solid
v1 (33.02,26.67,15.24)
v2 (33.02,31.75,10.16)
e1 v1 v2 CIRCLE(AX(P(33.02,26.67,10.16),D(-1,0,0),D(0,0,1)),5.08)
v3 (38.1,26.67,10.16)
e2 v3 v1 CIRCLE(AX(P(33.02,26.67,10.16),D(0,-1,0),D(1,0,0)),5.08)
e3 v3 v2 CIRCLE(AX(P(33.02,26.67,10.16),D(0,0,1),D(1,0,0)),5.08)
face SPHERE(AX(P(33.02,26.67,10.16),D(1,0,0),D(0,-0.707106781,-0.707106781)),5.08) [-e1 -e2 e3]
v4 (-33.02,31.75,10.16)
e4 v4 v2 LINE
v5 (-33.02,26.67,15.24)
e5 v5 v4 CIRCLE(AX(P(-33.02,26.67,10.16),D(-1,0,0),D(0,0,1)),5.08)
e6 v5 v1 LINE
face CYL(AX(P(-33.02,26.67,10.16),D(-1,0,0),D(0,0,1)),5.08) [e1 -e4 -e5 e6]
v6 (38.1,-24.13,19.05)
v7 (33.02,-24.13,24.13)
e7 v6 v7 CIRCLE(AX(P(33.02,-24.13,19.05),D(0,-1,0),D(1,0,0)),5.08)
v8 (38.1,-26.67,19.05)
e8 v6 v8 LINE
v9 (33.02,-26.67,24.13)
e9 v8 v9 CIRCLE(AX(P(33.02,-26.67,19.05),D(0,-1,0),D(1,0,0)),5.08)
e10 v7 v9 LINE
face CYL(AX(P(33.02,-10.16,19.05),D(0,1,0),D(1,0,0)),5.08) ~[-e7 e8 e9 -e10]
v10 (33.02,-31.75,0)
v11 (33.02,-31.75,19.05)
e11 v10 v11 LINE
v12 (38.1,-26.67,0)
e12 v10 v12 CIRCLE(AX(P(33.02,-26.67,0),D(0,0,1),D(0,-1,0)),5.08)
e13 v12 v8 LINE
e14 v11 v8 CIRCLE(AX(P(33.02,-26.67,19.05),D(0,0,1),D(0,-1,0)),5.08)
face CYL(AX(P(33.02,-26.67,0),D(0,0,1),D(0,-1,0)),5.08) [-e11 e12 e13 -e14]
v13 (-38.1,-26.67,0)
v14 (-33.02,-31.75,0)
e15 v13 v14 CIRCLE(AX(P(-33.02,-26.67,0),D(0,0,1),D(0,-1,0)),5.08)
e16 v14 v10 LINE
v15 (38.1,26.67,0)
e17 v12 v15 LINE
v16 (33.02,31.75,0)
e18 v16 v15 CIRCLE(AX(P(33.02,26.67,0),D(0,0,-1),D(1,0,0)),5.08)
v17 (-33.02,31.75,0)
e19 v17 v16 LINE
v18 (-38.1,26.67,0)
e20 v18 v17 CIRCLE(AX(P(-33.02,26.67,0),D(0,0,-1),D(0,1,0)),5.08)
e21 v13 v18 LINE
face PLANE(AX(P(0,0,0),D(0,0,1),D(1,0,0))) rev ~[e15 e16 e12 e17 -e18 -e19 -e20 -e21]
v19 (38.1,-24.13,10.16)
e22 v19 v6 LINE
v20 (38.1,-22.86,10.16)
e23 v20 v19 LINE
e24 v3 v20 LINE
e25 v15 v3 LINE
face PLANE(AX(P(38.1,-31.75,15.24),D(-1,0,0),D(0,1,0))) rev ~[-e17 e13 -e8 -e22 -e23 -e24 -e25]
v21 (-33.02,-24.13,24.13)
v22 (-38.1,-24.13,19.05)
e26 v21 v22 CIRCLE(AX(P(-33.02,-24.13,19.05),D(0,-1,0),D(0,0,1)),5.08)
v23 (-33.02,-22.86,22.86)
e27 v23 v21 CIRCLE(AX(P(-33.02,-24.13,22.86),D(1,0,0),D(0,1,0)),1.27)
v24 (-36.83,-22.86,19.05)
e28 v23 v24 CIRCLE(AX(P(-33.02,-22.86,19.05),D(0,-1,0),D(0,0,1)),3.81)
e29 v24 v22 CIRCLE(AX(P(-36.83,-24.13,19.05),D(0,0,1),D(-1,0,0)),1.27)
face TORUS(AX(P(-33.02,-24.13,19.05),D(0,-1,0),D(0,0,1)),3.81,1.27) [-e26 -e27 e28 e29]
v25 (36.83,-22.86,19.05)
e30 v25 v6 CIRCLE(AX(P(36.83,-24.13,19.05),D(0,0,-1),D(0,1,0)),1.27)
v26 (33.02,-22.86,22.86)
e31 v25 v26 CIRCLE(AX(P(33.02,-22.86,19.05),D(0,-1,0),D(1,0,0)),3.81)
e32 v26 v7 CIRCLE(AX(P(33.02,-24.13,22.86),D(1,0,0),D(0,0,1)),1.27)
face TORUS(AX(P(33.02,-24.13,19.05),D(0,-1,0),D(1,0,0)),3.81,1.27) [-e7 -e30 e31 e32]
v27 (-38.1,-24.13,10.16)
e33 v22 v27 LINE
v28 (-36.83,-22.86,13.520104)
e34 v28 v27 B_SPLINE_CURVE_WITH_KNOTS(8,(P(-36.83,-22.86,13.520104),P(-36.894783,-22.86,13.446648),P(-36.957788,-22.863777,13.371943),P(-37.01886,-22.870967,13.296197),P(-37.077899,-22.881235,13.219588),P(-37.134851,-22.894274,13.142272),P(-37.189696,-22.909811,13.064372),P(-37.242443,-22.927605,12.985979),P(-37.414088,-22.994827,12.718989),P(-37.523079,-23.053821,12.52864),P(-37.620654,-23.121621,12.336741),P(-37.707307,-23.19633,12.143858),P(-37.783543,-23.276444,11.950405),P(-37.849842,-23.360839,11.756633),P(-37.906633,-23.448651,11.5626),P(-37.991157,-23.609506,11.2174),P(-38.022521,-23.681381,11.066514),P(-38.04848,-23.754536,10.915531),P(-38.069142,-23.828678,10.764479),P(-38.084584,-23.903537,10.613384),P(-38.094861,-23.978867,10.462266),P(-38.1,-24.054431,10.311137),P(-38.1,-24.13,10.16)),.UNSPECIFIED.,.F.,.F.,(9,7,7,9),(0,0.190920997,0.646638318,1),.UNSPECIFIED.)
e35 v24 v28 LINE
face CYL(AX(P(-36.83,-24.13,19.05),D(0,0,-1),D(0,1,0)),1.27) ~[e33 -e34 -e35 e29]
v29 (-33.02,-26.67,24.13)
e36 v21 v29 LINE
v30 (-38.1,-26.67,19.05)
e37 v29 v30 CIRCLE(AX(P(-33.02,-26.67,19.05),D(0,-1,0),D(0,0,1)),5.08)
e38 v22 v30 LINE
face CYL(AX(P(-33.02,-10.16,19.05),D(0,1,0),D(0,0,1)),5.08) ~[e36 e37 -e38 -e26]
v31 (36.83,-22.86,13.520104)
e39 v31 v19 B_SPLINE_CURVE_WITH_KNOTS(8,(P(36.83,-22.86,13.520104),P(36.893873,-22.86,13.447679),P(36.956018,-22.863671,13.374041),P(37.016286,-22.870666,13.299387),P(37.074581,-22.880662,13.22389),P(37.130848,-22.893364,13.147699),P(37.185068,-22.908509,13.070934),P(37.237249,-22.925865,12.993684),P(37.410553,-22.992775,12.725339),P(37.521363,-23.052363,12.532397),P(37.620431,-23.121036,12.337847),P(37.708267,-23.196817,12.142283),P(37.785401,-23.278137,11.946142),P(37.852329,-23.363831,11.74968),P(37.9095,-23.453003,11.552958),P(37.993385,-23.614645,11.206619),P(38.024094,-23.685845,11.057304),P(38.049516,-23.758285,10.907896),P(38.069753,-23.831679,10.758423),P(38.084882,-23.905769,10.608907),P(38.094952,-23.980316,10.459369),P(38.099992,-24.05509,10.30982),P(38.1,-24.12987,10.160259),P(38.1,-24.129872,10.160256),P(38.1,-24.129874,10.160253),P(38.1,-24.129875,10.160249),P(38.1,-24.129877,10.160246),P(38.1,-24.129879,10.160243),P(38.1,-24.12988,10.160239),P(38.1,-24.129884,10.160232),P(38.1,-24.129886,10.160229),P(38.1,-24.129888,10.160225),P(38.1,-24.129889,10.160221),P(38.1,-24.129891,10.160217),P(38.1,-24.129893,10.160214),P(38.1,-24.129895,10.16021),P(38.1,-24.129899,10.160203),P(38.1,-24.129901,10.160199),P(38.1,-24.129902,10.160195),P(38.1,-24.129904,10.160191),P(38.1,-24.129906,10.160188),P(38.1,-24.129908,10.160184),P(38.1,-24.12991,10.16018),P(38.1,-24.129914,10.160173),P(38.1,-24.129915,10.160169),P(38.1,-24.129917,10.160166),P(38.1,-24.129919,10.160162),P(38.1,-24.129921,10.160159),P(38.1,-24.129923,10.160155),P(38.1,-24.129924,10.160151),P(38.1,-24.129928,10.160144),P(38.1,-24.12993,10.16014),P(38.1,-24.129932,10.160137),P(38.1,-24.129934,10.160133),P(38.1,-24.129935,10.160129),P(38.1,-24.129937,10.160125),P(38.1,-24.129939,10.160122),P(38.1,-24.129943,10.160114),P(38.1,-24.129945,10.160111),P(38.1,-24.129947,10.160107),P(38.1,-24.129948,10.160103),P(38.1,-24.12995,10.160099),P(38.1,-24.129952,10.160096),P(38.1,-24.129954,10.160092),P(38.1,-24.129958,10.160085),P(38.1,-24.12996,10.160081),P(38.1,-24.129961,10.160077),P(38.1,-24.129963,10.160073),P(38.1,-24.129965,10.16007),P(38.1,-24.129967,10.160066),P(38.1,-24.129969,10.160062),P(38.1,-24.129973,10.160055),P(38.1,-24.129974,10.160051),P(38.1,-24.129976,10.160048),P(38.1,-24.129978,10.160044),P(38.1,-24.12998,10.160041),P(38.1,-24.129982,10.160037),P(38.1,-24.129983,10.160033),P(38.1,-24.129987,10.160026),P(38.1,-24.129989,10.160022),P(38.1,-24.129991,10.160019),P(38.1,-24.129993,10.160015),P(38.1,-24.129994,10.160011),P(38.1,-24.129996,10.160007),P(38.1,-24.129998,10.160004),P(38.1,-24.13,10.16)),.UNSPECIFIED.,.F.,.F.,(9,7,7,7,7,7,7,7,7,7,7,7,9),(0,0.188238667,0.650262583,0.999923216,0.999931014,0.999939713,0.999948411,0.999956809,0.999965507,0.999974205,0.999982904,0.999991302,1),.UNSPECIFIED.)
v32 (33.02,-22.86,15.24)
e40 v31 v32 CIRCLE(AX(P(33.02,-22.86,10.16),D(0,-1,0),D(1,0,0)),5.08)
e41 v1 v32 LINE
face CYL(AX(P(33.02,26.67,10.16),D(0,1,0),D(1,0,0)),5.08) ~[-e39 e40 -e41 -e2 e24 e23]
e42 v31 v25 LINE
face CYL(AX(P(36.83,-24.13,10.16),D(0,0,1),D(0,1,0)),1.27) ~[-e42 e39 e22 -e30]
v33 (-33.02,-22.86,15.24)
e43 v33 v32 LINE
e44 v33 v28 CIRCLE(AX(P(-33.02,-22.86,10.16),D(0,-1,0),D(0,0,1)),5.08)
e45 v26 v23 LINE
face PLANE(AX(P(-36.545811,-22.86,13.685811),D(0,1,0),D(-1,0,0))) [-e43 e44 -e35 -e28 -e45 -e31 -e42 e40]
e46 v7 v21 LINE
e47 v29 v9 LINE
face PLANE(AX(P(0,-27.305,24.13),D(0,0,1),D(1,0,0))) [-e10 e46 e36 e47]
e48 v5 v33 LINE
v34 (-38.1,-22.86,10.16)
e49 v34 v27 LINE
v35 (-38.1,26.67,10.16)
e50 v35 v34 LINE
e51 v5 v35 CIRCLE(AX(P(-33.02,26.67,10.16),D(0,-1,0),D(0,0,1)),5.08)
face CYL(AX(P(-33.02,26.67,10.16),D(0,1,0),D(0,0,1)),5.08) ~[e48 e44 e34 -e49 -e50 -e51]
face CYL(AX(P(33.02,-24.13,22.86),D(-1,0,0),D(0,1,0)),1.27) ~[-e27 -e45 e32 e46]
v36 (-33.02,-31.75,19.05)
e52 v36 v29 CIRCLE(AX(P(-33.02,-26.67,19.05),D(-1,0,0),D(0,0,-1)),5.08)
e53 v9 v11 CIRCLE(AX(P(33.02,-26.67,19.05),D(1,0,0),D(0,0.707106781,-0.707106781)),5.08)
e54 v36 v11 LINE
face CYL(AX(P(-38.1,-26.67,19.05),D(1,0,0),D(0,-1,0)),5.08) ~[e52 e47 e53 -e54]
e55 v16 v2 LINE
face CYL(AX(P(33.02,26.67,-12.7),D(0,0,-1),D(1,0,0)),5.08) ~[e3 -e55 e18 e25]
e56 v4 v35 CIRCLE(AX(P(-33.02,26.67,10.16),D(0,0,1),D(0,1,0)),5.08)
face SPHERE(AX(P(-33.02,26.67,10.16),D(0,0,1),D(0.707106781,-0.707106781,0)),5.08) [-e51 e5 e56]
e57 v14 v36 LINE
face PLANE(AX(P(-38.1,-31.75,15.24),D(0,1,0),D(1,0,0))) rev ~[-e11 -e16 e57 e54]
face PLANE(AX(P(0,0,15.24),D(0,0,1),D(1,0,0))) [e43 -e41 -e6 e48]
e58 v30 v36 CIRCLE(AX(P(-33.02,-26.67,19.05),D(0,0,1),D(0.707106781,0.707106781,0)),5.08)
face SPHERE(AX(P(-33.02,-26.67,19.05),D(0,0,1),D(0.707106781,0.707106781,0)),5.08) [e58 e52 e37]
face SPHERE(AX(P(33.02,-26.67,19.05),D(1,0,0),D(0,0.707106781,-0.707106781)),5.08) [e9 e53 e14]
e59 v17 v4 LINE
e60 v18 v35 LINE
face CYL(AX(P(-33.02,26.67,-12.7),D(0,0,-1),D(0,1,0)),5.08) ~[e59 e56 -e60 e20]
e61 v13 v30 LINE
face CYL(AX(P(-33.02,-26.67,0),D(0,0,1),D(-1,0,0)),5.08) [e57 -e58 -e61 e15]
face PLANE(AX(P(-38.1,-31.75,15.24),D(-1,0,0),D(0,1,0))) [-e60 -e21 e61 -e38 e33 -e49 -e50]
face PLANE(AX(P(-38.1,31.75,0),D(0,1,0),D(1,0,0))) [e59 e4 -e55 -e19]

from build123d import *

# Parameters (mm, degrees)
F0_W         = 76.2
F0_H         = 63.5
F1_DEPTH     = 15.24
F2_W         = 76.2
F2_H         = 8.89
F3_DEPTH     = 8.89
F4_R         = 5.08
F5_T1_DEPTH  = 16.51
F5_T3_DEPTH  = 49.53
F5_T5_DEPTH  = 66.04
F5_T7_DEPTH  = 22.86
F5_S11_W     = 5.08
F5_S11_H     = 5.08
F5_T12_DEPTH = 5.08
F5_S17_W     = 5.08
F5_S17_H     = 5.08
F5_T18_DEPTH = 5.08
F5_S23_W     = 5.08
F5_S23_H     = 5.08
F5_T24_DEPTH = 5.08
F5_S29_W     = 5.08
F5_S29_H     = 5.08
F5_T30_DEPTH = 5.08
F6_R         = 1.27


# Not quite as in the source:
# - a fillet or chamfer that OpenCascade refuses, or shapes differently, is made with other operations: its cross-section is extruded or revolved along the edge and cut away or added


with BuildPart() as f1:
    # F0 (on Top) → F1 (new body)
    with BuildSketch(Plane.XY):
        Rectangle(F0_W, F0_H)
    extrude(amount=F1_DEPTH)

    # F2 (on face) → F3 (join)
    with BuildSketch(Plane.XY.offset(15.24)):
        with Locations((0, -27.305)):
            Rectangle(F2_W, F2_H)
    extrude(amount=F3_DEPTH)

    # F4
    f4_edges = [f1.edges().sort_by_distance(p)[0] for p in [
        (38.1, -31.75, 12.065),
        (-38.1, -31.75, 12.065),
        (0, -31.75, 24.13),
    ]]
    fillet(f4_edges, radius=F4_R)

    # F5: fillet of radius 5.08 on 7 edges, made by hand

    # F5_s2 → F5_t1 (cut)
    with BuildSketch(Plane.XZ.offset(10.16)):
        with BuildLine():
            ThreePointArc((-33.02, 24.13), (-36.6121024484, 22.6421024484), (-38.1, 19.05))
            Line((-38.1, 19.05), (-38.1, 24.13))
            Line((-38.1, 24.13), (-33.02, 24.13))
        make_face()
        with BuildLine():
            ThreePointArc((38.1, 19.05), (36.6121024484, 22.6421024484), (33.02, 24.13))
            Line((33.02, 24.13), (38.1, 24.13))
            Line((38.1, 24.13), (38.1, 19.05))
        make_face()
    extrude(amount=F5_T1_DEPTH, mode=Mode.SUBTRACT)

    # F5_s4 → F5_t3 (cut)
    with BuildSketch(Plane.XZ.offset(-26.67)):
        with BuildLine():
            ThreePointArc((-33.02, 15.24), (-36.6121024484, 13.7521024484), (-38.1, 10.16))
            Line((-38.1, 10.16), (-38.1, 15.24))
            Line((-38.1, 15.24), (-33.02, 15.24))
        make_face()
        with BuildLine():
            ThreePointArc((38.1, 10.16), (36.6121024484, 13.7521024484), (33.02, 15.24))
            Line((33.02, 15.24), (38.1, 15.24))
            Line((38.1, 15.24), (38.1, 10.16))
        make_face()
    extrude(amount=F5_T3_DEPTH, mode=Mode.SUBTRACT)

    # F5_s6 → F5_t5 (cut)
    with BuildSketch(Plane.YZ.offset(-33.02)):
        with BuildLine():
            ThreePointArc((26.67, 15.24), (30.2621024484, 13.7521024484), (31.75, 10.16))
            Line((31.75, 10.16), (31.75, 15.24))
            Line((31.75, 15.24), (26.67, 15.24))
        make_face()
    extrude(amount=F5_T5_DEPTH, mode=Mode.SUBTRACT)

    # F5_s8 → F5_t7 (cut)
    with BuildSketch(Plane.XY.offset(-12.7)):
        with BuildLine():
            ThreePointArc((38.1, 26.67), (36.6121024484, 30.2621024484), (33.02, 31.75))
            Line((33.02, 31.75), (38.1, 31.75))
            Line((38.1, 31.75), (38.1, 26.67))
        make_face()
        with BuildLine():
            ThreePointArc((-33.02, 31.75), (-36.6121024484, 30.2621024484), (-38.1, 26.67))
            Line((-38.1, 26.67), (-38.1, 31.75))
            Line((-38.1, 31.75), (-33.02, 31.75))
        make_face()
    extrude(amount=F5_T7_DEPTH, mode=Mode.SUBTRACT)


with BuildPart() as f5_tool10:
    # F5_s11 → F5_t12 (new body)
    with BuildSketch(Plane.YZ.offset(33.02)):
        with Locations((-29.21, 21.59)):
            Rectangle(F5_S11_W, F5_S11_H)
    extrude(amount=F5_T12_DEPTH)

    # F5_s13 → F5_t14 (revolve, cut)
    with BuildSketch(Plane(origin=(33.02, -26.67, 19.05), x_dir=(0, 0.7071067812, -0.7071067812), z_dir=(0, -0.7071067812, -0.7071067812))):
        with BuildLine():
            ThreePointArc((0, -5.08), (5.08, 0), (0, 5.08))
            Line((0, 5.08), (0, -5.08))
        make_face()
    revolve(axis=Axis((33.02, -26.67, 19.05), (1, 0, 0)), mode=Mode.SUBTRACT)


with BuildPart() as f1_1:
    add(f1.part)

    # F5_t9: cut F5_tool10
    add(f5_tool10.part, mode=Mode.SUBTRACT)


with BuildPart() as f5_tool16:
    # F5_s17 → F5_t18 (new body)
    with BuildSketch(Plane.XY.offset(19.05)):
        with Locations((-35.56, -29.21)):
            Rectangle(F5_S17_W, F5_S17_H)
    extrude(amount=F5_T18_DEPTH)

    # F5_s19 → F5_t20 (revolve, cut)
    with BuildSketch(Plane(origin=(-33.02, -26.67, 19.05), x_dir=(0.7071067812, 0.7071067812, 0), z_dir=(0.7071067812, -0.7071067812, 0))):
        with BuildLine():
            ThreePointArc((0, -5.08), (5.08, 0), (0, 5.08))
            Line((0, 5.08), (0, -5.08))
        make_face()
    revolve(axis=Axis((-33.02, -26.67, 19.05), (0, 0, 1)), mode=Mode.SUBTRACT)


with BuildPart() as f1_2:
    add(f1_1.part)

    # F5_t15: cut F5_tool16
    add(f5_tool16.part, mode=Mode.SUBTRACT)


with BuildPart() as f5_tool22:
    # F5_s23 → F5_t24 (new body)
    with BuildSketch(Plane.XY.offset(10.16)):
        with Locations((-35.56, 29.21)):
            Rectangle(F5_S23_W, F5_S23_H)
    extrude(amount=F5_T24_DEPTH)

    # F5_s25 → F5_t26 (revolve, cut)
    with BuildSketch(Plane(origin=(-33.02, 26.67, 10.16), x_dir=(0.7071067812, -0.7071067812, 0), z_dir=(-0.7071067812, -0.7071067812, 0))):
        with BuildLine():
            ThreePointArc((0, -5.08), (5.08, 0), (0, 5.08))
            Line((0, 5.08), (0, -5.08))
        make_face()
    revolve(axis=Axis((-33.02, 26.67, 10.16), (0, 0, 1)), mode=Mode.SUBTRACT)


with BuildPart() as f1_3:
    add(f1_2.part)

    # F5_t21: cut F5_tool22
    add(f5_tool22.part, mode=Mode.SUBTRACT)


with BuildPart() as f5_tool28:
    # F5_s29 → F5_t30 (new body)
    with BuildSketch(Plane.YZ.offset(33.02)):
        with Locations((29.21, 12.7)):
            Rectangle(F5_S29_W, F5_S29_H)
    extrude(amount=F5_T30_DEPTH)

    # F5_s31 → F5_t32 (revolve, cut)
    with BuildSketch(Plane(origin=(33.02, 26.67, 10.16), x_dir=(0, -0.7071067812, -0.7071067812), z_dir=(0, -0.7071067812, 0.7071067812))):
        with BuildLine():
            ThreePointArc((0, -5.08), (5.08, 0), (0, 5.08))
            Line((0, 5.08), (0, -5.08))
        make_face()
    revolve(axis=Axis((33.02, 26.67, 10.16), (1, 0, 0)), mode=Mode.SUBTRACT)


with BuildPart() as f1_4:
    add(f1_3.part)

    # F5_t27: cut F5_tool28
    add(f5_tool28.part, mode=Mode.SUBTRACT)

    # F6
    f6_edges = [f1_4.edges().sort_by_distance(p)[0] for p in [
        (38.1, -22.86, 14.605),
        (36.612102, -22.86, 22.642102),
        (-38.1, -22.86, 14.605),
        (-36.612102, -22.86, 22.642102),
        (0, -22.86, 24.13),
    ]]
    fillet(f6_edges, radius=F6_R)


solid = f1_4.part
